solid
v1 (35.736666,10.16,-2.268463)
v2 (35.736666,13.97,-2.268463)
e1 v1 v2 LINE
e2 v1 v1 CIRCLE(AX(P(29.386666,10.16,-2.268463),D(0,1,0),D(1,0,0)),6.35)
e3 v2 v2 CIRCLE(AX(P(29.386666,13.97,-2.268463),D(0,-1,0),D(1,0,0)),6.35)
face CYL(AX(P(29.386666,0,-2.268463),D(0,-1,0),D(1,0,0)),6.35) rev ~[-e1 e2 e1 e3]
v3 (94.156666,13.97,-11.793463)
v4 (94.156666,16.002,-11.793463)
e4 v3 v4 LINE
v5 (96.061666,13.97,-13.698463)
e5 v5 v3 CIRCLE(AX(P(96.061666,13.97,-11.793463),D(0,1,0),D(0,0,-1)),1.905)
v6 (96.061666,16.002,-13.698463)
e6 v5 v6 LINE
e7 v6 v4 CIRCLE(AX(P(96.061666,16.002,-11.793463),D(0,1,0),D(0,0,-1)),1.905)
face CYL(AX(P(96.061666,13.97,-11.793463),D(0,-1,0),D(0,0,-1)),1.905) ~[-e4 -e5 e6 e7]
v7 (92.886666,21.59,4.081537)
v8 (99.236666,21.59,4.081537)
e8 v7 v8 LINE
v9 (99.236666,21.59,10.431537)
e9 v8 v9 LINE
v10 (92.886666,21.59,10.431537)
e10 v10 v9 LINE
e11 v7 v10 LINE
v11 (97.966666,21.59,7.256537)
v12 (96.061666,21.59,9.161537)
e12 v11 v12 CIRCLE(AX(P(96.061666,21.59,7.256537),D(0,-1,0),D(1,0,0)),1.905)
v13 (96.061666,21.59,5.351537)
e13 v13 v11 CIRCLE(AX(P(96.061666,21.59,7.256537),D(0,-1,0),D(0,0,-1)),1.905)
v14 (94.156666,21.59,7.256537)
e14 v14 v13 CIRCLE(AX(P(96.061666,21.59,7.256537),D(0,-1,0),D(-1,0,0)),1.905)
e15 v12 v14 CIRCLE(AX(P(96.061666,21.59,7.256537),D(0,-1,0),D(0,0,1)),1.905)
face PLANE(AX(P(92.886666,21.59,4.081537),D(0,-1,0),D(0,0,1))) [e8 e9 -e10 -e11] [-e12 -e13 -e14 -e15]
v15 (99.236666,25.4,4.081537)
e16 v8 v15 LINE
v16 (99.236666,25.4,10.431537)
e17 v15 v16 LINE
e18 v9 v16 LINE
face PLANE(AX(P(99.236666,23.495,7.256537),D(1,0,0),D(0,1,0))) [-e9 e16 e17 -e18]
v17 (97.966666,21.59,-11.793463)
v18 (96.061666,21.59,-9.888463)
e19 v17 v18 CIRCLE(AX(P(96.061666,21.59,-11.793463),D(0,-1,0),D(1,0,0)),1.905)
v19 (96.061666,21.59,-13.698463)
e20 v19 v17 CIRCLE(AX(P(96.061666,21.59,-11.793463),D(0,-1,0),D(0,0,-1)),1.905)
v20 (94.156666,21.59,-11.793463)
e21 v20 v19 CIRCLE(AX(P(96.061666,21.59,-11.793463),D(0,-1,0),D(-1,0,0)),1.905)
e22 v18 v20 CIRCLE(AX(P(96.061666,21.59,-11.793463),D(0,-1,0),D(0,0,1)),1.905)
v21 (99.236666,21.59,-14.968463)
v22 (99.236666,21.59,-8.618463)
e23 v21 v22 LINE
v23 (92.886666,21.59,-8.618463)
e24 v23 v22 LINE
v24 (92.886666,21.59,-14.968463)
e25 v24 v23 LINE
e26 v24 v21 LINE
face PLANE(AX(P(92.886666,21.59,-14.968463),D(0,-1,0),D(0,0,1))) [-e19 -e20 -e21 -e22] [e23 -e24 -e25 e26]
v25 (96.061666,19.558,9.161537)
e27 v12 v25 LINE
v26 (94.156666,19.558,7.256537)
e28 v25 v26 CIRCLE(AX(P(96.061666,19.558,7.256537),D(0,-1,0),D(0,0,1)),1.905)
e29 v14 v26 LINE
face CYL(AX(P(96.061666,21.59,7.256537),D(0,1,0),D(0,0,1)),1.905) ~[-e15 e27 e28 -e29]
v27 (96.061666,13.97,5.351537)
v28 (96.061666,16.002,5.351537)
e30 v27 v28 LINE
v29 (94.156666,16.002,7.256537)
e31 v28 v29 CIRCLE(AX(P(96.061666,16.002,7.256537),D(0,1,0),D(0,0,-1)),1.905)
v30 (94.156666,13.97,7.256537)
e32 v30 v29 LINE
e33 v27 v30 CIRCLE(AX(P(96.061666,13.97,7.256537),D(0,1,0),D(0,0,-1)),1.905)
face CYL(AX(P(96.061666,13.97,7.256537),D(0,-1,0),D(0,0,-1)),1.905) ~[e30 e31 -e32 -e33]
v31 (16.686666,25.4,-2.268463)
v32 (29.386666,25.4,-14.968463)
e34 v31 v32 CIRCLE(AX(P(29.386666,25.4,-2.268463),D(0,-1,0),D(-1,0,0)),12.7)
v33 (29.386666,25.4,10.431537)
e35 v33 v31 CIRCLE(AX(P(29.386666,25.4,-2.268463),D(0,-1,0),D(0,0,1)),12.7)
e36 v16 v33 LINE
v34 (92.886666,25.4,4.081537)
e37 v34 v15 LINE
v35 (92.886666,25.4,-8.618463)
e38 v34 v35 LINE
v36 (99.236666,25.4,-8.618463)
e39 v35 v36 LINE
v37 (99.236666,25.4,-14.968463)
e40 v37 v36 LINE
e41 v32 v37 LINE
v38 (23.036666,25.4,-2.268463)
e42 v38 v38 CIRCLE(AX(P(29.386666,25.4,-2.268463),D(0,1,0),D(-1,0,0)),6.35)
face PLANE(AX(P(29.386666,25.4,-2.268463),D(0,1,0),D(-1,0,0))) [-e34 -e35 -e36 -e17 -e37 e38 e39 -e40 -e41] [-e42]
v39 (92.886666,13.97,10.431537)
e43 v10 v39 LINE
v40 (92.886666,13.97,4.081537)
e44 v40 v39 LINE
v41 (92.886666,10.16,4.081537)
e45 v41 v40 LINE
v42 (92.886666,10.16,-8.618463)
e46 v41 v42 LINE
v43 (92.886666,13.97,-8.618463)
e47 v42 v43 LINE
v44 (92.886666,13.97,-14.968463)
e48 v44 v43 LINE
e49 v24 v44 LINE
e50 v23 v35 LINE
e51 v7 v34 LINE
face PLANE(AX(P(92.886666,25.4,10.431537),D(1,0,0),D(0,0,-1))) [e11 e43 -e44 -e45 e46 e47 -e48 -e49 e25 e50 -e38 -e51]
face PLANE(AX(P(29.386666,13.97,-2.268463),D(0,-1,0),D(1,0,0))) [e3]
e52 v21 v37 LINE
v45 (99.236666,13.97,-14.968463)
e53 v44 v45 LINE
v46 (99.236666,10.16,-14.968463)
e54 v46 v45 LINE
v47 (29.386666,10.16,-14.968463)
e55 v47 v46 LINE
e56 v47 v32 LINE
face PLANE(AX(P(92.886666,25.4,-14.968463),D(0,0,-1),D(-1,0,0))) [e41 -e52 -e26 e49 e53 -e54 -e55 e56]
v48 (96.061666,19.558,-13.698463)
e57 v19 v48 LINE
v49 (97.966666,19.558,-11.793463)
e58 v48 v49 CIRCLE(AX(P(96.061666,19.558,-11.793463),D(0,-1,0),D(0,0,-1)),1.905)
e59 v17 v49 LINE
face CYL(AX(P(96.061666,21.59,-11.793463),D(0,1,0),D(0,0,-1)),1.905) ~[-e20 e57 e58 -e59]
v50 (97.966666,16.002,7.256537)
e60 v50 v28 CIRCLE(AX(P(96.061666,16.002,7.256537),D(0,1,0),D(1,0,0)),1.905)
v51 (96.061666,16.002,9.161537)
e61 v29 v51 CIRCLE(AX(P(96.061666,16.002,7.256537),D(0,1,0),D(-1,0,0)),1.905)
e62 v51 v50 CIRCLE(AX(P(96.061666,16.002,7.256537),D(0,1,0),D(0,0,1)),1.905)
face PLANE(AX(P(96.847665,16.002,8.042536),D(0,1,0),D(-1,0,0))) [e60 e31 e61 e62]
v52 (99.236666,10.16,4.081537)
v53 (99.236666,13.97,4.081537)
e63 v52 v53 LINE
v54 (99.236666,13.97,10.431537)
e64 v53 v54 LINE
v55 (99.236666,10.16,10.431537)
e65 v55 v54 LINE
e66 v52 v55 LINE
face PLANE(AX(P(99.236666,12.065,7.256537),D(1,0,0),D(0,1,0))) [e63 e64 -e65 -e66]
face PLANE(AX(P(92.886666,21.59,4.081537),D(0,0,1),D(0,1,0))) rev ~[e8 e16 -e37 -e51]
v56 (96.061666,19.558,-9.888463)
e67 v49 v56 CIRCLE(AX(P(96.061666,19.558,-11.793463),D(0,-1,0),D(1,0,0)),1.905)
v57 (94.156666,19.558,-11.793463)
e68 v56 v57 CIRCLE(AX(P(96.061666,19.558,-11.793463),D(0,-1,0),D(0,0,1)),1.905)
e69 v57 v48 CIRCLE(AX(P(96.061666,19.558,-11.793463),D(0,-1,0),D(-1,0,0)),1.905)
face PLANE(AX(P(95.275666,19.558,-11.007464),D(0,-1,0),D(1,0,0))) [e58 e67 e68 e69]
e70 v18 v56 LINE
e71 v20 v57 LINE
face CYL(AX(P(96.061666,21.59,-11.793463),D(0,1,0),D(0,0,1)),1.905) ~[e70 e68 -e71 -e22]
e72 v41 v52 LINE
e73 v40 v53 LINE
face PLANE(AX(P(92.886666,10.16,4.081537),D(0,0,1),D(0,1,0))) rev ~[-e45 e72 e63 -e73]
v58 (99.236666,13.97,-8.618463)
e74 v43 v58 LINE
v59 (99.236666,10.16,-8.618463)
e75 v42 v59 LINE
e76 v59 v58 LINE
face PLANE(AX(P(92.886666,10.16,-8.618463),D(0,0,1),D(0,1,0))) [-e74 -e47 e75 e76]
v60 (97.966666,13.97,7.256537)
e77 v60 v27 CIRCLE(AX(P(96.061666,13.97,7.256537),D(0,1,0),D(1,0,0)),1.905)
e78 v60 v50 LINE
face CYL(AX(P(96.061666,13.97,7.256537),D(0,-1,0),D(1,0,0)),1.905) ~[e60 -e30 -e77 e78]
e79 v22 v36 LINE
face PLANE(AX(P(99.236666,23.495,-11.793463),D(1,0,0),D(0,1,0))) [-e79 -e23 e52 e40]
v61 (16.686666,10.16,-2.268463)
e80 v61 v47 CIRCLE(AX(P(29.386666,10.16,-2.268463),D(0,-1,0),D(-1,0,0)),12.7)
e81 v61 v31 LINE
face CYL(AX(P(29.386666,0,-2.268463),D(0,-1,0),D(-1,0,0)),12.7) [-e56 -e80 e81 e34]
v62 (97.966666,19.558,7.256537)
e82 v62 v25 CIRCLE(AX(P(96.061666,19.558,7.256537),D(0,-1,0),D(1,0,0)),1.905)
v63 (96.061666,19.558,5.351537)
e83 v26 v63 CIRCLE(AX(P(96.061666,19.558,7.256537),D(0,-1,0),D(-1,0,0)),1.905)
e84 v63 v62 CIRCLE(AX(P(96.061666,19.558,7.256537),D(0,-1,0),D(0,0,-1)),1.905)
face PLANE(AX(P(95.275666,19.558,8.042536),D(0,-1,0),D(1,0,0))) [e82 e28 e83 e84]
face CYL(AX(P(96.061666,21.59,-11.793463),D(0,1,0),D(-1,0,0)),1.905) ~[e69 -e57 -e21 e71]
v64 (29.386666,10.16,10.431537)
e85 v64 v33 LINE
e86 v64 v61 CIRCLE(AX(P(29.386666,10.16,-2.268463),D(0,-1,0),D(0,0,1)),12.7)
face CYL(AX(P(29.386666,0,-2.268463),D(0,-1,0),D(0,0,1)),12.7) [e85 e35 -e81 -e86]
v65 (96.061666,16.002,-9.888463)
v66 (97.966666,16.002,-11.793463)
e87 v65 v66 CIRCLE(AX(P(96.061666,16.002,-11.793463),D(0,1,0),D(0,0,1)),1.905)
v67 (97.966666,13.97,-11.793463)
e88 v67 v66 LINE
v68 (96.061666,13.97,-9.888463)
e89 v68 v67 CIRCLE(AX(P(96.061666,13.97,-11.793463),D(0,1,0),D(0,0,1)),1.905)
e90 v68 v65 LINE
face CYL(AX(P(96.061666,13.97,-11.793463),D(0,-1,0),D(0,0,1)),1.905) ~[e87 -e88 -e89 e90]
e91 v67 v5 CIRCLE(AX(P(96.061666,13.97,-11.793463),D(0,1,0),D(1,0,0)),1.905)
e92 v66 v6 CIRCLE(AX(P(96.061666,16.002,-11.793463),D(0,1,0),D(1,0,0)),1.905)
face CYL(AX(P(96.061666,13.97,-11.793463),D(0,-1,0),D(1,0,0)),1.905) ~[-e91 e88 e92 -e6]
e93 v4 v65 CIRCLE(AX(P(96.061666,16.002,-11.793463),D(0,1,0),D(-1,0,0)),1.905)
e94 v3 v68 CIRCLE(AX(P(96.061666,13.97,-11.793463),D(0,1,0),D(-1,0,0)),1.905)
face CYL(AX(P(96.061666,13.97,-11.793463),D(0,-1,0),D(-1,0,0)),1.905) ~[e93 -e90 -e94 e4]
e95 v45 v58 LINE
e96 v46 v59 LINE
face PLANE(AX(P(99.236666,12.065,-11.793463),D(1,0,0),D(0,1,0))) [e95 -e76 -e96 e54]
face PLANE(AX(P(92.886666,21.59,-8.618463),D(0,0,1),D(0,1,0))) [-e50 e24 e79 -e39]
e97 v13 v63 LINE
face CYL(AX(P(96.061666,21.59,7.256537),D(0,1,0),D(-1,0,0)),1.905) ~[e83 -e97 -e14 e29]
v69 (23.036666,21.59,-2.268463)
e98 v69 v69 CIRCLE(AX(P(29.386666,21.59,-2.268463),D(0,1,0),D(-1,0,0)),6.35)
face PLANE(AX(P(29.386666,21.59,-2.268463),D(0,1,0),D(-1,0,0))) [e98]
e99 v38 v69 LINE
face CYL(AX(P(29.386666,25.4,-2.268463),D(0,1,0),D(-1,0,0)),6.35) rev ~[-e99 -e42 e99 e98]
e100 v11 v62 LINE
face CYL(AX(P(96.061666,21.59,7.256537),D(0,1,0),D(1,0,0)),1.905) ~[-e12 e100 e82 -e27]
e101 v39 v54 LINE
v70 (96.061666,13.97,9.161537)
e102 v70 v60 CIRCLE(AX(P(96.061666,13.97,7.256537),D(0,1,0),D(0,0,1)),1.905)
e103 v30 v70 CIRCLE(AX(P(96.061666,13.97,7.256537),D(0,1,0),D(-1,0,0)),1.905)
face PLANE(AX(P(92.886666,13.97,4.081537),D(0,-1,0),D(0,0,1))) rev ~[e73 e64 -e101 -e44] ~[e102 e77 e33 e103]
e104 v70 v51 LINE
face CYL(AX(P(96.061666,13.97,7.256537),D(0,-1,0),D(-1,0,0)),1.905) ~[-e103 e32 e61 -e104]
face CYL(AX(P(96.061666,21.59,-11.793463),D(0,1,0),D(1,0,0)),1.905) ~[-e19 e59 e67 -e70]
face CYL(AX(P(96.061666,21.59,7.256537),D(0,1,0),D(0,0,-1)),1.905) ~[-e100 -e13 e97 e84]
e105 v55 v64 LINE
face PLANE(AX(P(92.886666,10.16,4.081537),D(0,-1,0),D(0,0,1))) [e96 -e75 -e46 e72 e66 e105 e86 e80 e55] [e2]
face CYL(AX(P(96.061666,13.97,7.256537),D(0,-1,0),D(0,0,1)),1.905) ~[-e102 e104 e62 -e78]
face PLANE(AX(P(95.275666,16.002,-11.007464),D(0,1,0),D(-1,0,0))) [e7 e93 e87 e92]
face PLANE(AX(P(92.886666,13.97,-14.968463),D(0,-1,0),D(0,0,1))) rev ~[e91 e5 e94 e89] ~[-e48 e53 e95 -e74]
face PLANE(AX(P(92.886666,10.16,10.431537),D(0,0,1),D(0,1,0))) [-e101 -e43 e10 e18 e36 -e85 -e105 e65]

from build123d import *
from build123d import SkipClean  # not in build123d's __all__

# Parameters (mm, degrees)
F0_R      = 6.35
F1_DEPTH  = 25.4
F2_R      = 6.35
F3_DEPTH  = 25.4
F4_DEPTH  = 5.08
F5_DEPTH  = 8.89
F6_DEPTH  = 20.32
F7_DEPTH  = 10.16
F8_DEPTH  = 5.08
F9_DEPTH  = 13.97
F10_DEPTH = 3.81
F11_W     = 3.81
F11_H     = 6.35
F12_DEPTH = 6.35
F17_DEPTH = 2.032
F18_DEPTH = 2.032


with BuildPart() as f1:
    # F0 (on Front) → F1 (new body)
    with BuildSketch(Plane.XZ):
        with BuildLine():
            ThreePointArc((42.0866659097, -2.2684633732), (38.3669220307, 6.7117927479), (29.3866659097, 10.4315366268))
            ThreePointArc((29.3866659097, 10.4315366268), (20.4064097886, 6.7117927479), (16.6866659097, -2.2684633732))
            ThreePointArc((16.6866659097, -2.2684633732), (20.4064097886, -11.2487194943), (29.3866659097, -14.9684633732))
            ThreePointArc((29.3866659097, -14.9684633732), (38.3669220307, -11.2487194943), (42.0866659097, -2.2684633732))
        make_face()
        with Locations((29.3866659097, -2.2684633732)):
            Circle(F0_R, mode=Mode.SUBTRACT)
        with Locations((29.3866659097, -2.2684633732)):
            Circle(F0_R)
        with BuildLine():
            Line((92.8866659097, 10.4315366268), (29.3866659097, 10.4315366268))
            ThreePointArc((29.3866659097, 10.4315366268), (38.3669220307, 6.7117927479), (42.0866659097, -2.2684633732))
            ThreePointArc((42.0866659097, -2.2684633732), (38.3669220307, -11.2487194943), (29.3866659097, -14.9684633732))
            Line((29.3866659097, -14.9684633732), (92.8866659097, -14.9684633732))
            Line((92.8866659097, -14.9684633732), (92.8866659097, 10.4315366268))
        make_face()
    extrude(amount=-F1_DEPTH)

    # F2 (on face) → F3 (cut, through all)
    with BuildSketch(Plane(origin=(0, 25.4, 0), x_dir=(-1, 0, 0), z_dir=(0, 1, 0))):
        with BuildLine():
            ThreePointArc((-29.3866659097, -14.9684633732), (-42.0866659097, -2.2684633732), (-29.3866659097, 10.4315366268))
            Line((-29.3866659097, 10.4315366268), (-92.8866659097, 10.4315366268))
            Line((-92.8866659097, 10.4315366268), (-92.8866659097, -14.9684633732))
            Line((-92.8866659097, -14.9684633732), (-29.3866659097, -14.9684633732))
        make_face()
        with Locations((-29.3866659097, -2.2684633732)):
            Circle(F2_R)
    with SkipClean():  # cleaning this boolean's faces spoils the solid; the shape is the same uncleaned
        extrude(amount=-F3_DEPTH, mode=Mode.SUBTRACT)

    # F2 (on face) → F4 (join)
    with BuildSketch(Plane(origin=(0, 25.4, 0), x_dir=(-1, 0, 0), z_dir=(0, 1, 0))):
        with BuildLine():
            ThreePointArc((-29.3866659097, -14.9684633732), (-42.0866659097, -2.2684633732), (-29.3866659097, 10.4315366268))
            Line((-29.3866659097, 10.4315366268), (-92.8866659097, 10.4315366268))
            Line((-92.8866659097, 10.4315366268), (-92.8866659097, -14.9684633732))
            Line((-92.8866659097, -14.9684633732), (-29.3866659097, -14.9684633732))
        make_face()
    extrude(amount=-F4_DEPTH)

    # F2 (on face) → F5 (join)
    with BuildSketch(Plane(origin=(0, 25.4, 0), x_dir=(-1, 0, 0), z_dir=(0, 1, 0))):
        with Locations((-29.3866659097, -2.2684633732)):
            Circle(F2_R)
    extrude(amount=-F5_DEPTH)

    # F2 (on face) → F6 (join)
    with BuildSketch(Plane(origin=(0, 25.4, 0), x_dir=(-1, 0, 0), z_dir=(0, 1, 0))):
        with BuildLine():
            ThreePointArc((-29.3866659097, -14.9684633732), (-42.0866659097, -2.2684633732), (-29.3866659097, 10.4315366268))
            Line((-29.3866659097, 10.4315366268), (-92.8866659097, 10.4315366268))
            Line((-92.8866659097, 10.4315366268), (-92.8866659097, -14.9684633732))
            Line((-92.8866659097, -14.9684633732), (-29.3866659097, -14.9684633732))
        make_face()
        with Locations((-29.3866659097, -2.2684633732)):
            Circle(F2_R)
    extrude(amount=-F6_DEPTH)

    # F7 (cut): a face of the model
    f7_faces = [f1.faces().sort_by_distance(p)[0] for p in [
        (29.3866659097, 0, 10.072326382),
    ]]
    extrude(f7_faces, amount=-F7_DEPTH, mode=Mode.SUBTRACT)

    # F8 (cut): a face of the model
    f8_faces = [f1.faces().sort_by_distance(p)[0] for p in [
        (66.0488875518, 5.08, -2.2684633732),
    ]]
    extrude(f8_faces, amount=-F8_DEPTH, mode=Mode.SUBTRACT)

    # F0 (on Front) → F9 (cut)
    with BuildSketch(Plane.XZ):
        with Locations((29.3866659097, -2.2684633732)):
            Circle(F0_R)
    extrude(amount=-F9_DEPTH, mode=Mode.SUBTRACT)

    # F2 (on face) → F10 (cut)
    with BuildSketch(Plane(origin=(0, 25.4, 0), x_dir=(-1, 0, 0), z_dir=(0, 1, 0))):
        with Locations((-29.3866659097, -2.2684633732)):
            Circle(F2_R)
    extrude(amount=-F10_DEPTH, mode=Mode.SUBTRACT)

    # F11 (on face) → F12 (join)
    with BuildSketch(Plane.YZ.offset(92.8866659097)):
        with Locations((12.065, 7.2565366268)):
            Rectangle(F11_W, F11_H)
        with Locations((23.495, 7.2565366268)):
            Rectangle(F11_W, F11_H)
        with Locations((23.495, -11.7934633732)):
            Rectangle(F11_W, F11_H)
        with Locations((12.065, -11.7934633732)):
            Rectangle(F11_W, F11_H)
    extrude(amount=F12_DEPTH)

    # F15 (on face) + F13 (on face) → F17 (join)
    with BuildSketch(Plane(origin=(0, 13.97, 0), x_dir=(-1, 0, 0), z_dir=(0, 1, 0))):
        with BuildLine():
            Line((-96.0616659097, -11.7934633732), (-94.1566659097, -11.7934633732))
            ThreePointArc((-94.1566659097, -11.7934633732), (-94.7146274915, -10.446424955), (-96.0616659097, -9.8884633732))
            Line((-96.0616659097, -9.8884633732), (-96.0616659097, -11.7934633732))
        make_face()
        with BuildLine():
            Line((-97.9666659097, -11.7934633732), (-96.0616659097, -11.7934633732))
            Line((-96.0616659097, -11.7934633732), (-96.0616659097, -9.8884633732))
            ThreePointArc((-96.0616659097, -9.8884633732), (-97.4087043278, -10.446424955), (-97.9666659097, -11.7934633732))
        make_face()
        with BuildLine():
            Line((-96.0616659097, -13.6984633732), (-96.0616659097, -11.7934633732))
            Line((-96.0616659097, -11.7934633732), (-97.9666659097, -11.7934633732))
            ThreePointArc((-97.9666659097, -11.7934633732), (-97.4087043278, -13.1405017913), (-96.0616659097, -13.6984633732))
        make_face()
        with BuildLine():
            ThreePointArc((-96.0616659097, -13.6984633732), (-94.7146274915, -13.1405017913), (-94.1566659097, -11.7934633732))
            Line((-94.1566659097, -11.7934633732), (-96.0616659097, -11.7934633732))
            Line((-96.0616659097, -11.7934633732), (-96.0616659097, -13.6984633732))
        make_face()
    with BuildSketch(Plane(origin=(0, 13.97, 0), x_dir=(-1, 0, 0), z_dir=(0, 1, 0))):
        with BuildLine():
            Line((-96.0616659097, 7.2565366268), (-96.0616659097, 9.1615366268))
            ThreePointArc((-96.0616659097, 9.1615366268), (-97.4087043278, 8.603575045), (-97.9666659097, 7.2565366268))
            Line((-97.9666659097, 7.2565366268), (-96.0616659097, 7.2565366268))
        make_face()
        with BuildLine():
            Line((-96.0616659097, 7.2565366268), (-94.1566659097, 7.2565366268))
            ThreePointArc((-94.1566659097, 7.2565366268), (-94.7146274915, 8.603575045), (-96.0616659097, 9.1615366268))
            Line((-96.0616659097, 9.1615366268), (-96.0616659097, 7.2565366268))
        make_face()
        with BuildLine():
            ThreePointArc((-97.9666659097, 7.2565366268), (-97.4087043278, 5.9094982087), (-96.0616659097, 5.3515366268))
            Line((-96.0616659097, 5.3515366268), (-96.0616659097, 7.2565366268))
            Line((-96.0616659097, 7.2565366268), (-97.9666659097, 7.2565366268))
        make_face()
        with BuildLine():
            ThreePointArc((-96.0616659097, 5.3515366268), (-94.7146274915, 5.9094982087), (-94.1566659097, 7.2565366268))
            Line((-94.1566659097, 7.2565366268), (-96.0616659097, 7.2565366268))
            Line((-96.0616659097, 7.2565366268), (-96.0616659097, 5.3515366268))
        make_face()
    extrude(amount=F17_DEPTH)

    # F14 (on face) + F16 (on face) → F18 (join)
    with BuildSketch(Plane.XZ.offset(-21.59)):
        with BuildLine():
            Line((96.0616659097, 7.2565366268), (96.0616659097, 9.1615366268))
            ThreePointArc((96.0616659097, 9.1615366268), (94.7146274915, 8.603575045), (94.1566659097, 7.2565366268))
            Line((94.1566659097, 7.2565366268), (96.0616659097, 7.2565366268))
        make_face()
        with BuildLine():
            Line((96.0616659097, 7.2565366268), (97.9666659097, 7.2565366268))
            ThreePointArc((97.9666659097, 7.2565366268), (97.4087043278, 8.603575045), (96.0616659097, 9.1615366268))
            Line((96.0616659097, 9.1615366268), (96.0616659097, 7.2565366268))
        make_face()
        with BuildLine():
            ThreePointArc((96.0616659097, 5.3515366268), (97.4087043278, 5.9094982087), (97.9666659097, 7.2565366268))
            Line((97.9666659097, 7.2565366268), (96.0616659097, 7.2565366268))
            Line((96.0616659097, 7.2565366268), (96.0616659097, 5.3515366268))
        make_face()
        with BuildLine():
            ThreePointArc((94.1566659097, 7.2565366268), (94.7146274915, 5.9094982087), (96.0616659097, 5.3515366268))
            Line((96.0616659097, 5.3515366268), (96.0616659097, 7.2565366268))
            Line((96.0616659097, 7.2565366268), (94.1566659097, 7.2565366268))
        make_face()
    with BuildSketch(Plane.XZ.offset(-21.59)):
        with BuildLine():
            Line((94.1566659097, -11.7934633732), (96.0616659097, -11.7934633732))
            Line((96.0616659097, -11.7934633732), (96.0616659097, -9.8884633732))
            ThreePointArc((96.0616659097, -9.8884633732), (94.7146274915, -10.446424955), (94.1566659097, -11.7934633732))
        make_face()
        with BuildLine():
            Line((96.0616659097, -9.8884633732), (96.0616659097, -11.7934633732))
            Line((96.0616659097, -11.7934633732), (97.9666659097, -11.7934633732))
            ThreePointArc((97.9666659097, -11.7934633732), (97.4087043278, -10.446424955), (96.0616659097, -9.8884633732))
        make_face()
        with BuildLine():
            Line((96.0616659097, -11.7934633732), (96.0616659097, -13.6984633732))
            ThreePointArc((96.0616659097, -13.6984633732), (97.4087043278, -13.1405017913), (97.9666659097, -11.7934633732))
            Line((97.9666659097, -11.7934633732), (96.0616659097, -11.7934633732))
        make_face()
        with BuildLine():
            ThreePointArc((94.1566659097, -11.7934633732), (94.7146274915, -13.1405017913), (96.0616659097, -13.6984633732))
            Line((96.0616659097, -13.6984633732), (96.0616659097, -11.7934633732))
            Line((96.0616659097, -11.7934633732), (94.1566659097, -11.7934633732))
        make_face()
    extrude(amount=F18_DEPTH)


solid = f1.part
